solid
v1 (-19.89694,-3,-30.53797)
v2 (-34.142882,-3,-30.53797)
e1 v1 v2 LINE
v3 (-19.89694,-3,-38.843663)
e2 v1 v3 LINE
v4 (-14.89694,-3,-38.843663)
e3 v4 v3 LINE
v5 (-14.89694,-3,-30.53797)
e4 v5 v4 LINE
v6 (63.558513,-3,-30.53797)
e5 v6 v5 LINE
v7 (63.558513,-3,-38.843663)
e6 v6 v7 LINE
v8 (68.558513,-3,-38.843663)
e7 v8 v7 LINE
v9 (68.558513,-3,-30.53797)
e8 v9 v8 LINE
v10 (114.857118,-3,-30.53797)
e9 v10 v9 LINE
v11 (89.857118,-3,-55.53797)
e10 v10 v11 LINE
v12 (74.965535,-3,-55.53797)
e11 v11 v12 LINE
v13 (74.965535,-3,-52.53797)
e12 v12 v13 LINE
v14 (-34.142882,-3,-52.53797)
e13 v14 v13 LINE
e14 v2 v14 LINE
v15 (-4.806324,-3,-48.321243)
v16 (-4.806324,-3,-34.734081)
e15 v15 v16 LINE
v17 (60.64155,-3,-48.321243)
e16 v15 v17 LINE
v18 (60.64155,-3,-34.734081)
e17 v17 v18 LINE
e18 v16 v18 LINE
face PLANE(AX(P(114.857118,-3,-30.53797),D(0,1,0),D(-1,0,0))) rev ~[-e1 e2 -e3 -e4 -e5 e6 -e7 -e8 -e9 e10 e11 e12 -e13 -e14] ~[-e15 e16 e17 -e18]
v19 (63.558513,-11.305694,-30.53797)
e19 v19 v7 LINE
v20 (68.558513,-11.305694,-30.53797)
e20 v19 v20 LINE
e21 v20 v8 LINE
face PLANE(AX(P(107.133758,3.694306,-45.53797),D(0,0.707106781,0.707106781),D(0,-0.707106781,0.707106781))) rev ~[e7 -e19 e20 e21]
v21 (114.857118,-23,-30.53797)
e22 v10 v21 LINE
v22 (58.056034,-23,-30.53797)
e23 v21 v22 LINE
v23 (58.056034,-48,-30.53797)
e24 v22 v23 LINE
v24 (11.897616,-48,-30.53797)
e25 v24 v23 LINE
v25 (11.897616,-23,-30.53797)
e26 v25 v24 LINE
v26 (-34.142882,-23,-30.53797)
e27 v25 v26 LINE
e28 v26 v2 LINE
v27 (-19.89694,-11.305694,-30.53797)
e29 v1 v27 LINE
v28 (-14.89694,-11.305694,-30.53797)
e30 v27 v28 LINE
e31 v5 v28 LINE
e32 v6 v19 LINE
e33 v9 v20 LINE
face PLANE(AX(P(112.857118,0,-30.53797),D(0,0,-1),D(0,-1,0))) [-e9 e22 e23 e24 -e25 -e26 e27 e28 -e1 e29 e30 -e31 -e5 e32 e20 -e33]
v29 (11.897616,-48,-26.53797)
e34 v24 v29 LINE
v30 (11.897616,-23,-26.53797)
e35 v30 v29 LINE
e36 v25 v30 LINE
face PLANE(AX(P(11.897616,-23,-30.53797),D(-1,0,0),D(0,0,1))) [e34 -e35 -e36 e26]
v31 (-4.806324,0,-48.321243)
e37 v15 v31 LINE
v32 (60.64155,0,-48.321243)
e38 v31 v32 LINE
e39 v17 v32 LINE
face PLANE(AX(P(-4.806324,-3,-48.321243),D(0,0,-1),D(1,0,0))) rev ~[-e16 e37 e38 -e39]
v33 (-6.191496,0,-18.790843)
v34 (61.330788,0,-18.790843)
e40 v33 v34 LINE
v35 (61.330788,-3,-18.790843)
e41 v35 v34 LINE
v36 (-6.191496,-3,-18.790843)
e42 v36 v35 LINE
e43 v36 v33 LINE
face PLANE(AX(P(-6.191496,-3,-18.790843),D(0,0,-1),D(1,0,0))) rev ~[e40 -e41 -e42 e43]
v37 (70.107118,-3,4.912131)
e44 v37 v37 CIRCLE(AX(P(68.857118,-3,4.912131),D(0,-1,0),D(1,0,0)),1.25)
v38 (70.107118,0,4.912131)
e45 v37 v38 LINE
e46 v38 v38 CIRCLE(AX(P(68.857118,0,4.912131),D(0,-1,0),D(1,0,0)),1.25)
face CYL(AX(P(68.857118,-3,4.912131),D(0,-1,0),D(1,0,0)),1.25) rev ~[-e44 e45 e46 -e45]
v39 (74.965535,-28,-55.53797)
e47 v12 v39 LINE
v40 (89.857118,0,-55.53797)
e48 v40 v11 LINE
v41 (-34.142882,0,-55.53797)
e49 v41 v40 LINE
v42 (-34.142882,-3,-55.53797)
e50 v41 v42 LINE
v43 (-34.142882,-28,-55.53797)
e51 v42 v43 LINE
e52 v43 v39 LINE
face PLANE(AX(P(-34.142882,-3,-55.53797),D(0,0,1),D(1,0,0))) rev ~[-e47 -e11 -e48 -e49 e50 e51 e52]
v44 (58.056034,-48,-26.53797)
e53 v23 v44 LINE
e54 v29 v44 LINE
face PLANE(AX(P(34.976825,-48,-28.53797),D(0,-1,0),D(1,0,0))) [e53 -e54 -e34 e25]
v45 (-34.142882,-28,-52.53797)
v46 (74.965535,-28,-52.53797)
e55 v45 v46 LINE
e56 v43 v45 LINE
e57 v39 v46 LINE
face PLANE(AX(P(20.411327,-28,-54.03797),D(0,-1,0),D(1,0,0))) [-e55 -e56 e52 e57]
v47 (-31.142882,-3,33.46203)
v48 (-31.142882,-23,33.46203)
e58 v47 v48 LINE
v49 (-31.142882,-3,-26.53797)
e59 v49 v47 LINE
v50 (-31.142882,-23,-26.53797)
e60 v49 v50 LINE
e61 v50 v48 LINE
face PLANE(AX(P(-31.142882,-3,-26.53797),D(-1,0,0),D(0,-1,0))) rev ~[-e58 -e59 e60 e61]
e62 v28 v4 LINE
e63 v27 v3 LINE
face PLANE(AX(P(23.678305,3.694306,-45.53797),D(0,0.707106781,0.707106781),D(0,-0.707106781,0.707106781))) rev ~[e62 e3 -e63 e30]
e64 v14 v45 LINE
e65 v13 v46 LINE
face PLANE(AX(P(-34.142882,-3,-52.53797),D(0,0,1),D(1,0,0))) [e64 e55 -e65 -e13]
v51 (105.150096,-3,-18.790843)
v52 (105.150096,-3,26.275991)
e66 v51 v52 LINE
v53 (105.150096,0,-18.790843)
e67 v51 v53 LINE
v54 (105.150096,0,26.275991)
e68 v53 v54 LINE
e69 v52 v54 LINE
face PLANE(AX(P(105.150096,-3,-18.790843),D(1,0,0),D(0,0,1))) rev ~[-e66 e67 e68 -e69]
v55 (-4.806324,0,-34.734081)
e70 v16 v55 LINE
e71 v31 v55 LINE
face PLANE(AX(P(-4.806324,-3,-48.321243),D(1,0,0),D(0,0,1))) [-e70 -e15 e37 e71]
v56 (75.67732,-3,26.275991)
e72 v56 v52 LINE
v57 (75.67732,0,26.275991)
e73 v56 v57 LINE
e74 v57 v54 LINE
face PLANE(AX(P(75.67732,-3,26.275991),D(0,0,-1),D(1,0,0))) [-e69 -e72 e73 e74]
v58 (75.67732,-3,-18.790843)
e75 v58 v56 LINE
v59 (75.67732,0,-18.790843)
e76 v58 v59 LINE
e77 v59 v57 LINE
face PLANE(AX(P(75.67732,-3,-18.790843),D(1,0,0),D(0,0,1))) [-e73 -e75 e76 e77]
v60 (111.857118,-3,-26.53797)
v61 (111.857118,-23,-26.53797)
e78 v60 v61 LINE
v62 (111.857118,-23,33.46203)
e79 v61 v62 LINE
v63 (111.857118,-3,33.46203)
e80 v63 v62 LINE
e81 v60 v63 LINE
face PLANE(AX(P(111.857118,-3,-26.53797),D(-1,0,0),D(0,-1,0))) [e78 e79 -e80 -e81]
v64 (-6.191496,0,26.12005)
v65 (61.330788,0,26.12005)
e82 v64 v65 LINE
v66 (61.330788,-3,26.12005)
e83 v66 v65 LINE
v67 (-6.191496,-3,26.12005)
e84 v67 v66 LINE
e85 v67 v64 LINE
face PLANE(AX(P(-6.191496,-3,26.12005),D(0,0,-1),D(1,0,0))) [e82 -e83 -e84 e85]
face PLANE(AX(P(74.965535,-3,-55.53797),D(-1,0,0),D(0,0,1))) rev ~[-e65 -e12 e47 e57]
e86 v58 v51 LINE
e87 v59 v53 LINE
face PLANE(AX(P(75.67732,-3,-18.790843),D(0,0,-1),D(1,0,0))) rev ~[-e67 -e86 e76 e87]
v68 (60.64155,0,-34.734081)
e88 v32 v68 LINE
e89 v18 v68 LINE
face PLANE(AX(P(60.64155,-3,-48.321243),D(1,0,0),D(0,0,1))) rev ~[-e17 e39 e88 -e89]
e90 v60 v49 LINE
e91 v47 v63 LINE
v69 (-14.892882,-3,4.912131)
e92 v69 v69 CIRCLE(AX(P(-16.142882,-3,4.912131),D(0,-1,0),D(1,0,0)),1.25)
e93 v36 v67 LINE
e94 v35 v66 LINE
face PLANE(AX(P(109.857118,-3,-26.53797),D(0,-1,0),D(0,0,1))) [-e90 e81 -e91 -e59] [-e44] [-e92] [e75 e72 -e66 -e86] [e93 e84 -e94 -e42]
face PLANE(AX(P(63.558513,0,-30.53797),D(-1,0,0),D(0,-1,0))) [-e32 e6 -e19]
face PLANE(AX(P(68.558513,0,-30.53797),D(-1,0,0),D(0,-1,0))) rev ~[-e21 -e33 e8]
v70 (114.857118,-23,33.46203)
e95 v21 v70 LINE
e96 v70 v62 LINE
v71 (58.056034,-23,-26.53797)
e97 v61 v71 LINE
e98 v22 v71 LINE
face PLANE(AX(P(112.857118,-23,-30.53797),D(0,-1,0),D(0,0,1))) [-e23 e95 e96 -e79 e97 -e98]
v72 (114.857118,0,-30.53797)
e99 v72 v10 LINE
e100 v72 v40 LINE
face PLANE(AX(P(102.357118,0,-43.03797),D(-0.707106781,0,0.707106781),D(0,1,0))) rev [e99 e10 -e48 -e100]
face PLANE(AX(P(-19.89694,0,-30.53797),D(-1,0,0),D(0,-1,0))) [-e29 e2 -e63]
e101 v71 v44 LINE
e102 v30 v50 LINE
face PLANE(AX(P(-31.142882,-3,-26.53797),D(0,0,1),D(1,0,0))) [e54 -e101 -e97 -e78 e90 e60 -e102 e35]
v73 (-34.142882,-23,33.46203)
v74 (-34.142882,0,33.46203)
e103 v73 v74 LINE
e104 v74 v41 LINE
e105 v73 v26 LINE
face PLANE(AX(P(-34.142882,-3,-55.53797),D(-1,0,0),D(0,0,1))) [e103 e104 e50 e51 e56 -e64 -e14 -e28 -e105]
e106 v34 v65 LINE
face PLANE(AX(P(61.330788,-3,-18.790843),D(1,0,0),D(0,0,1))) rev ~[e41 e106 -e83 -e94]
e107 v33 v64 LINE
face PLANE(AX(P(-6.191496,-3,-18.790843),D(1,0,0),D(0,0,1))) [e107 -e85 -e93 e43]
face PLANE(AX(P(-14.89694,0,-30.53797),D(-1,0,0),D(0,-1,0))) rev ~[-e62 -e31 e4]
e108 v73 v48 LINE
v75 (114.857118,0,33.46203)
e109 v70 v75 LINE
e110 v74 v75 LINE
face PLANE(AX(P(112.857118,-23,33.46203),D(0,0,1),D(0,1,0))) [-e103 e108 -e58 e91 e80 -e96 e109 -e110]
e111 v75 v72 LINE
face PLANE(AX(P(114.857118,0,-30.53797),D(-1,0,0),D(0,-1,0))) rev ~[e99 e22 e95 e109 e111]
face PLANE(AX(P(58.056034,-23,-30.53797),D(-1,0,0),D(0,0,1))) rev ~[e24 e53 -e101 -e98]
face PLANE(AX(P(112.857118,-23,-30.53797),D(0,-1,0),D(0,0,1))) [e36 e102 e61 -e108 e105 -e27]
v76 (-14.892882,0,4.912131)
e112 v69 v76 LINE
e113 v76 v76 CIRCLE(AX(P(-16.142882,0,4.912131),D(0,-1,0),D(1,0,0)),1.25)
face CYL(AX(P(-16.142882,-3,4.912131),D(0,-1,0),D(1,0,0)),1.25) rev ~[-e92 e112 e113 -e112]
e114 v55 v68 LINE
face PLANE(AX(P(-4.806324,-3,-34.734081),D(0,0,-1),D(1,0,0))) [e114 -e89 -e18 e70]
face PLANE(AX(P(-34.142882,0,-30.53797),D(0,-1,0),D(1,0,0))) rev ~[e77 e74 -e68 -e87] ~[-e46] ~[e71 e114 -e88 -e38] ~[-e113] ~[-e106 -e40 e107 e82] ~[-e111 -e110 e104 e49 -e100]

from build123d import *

# Parameters (mm, degrees)
F0_W         = 147
F0_H         = 60
F1_DEPTH     = 3
F2_W         = 3
F2_H         = 60
F3_DEPTH     = 20
F4_DEPTH     = 4
F5_W         = 141
F5_H         = 4
F6_DEPTH     = 20
F7_DEPTH     = 2
F8_DEPTH     = 2
F10_W        = 5
F10_H        = 11.305693537
F11_DEPTH    = 15
F9_R         = 1.25
F12_DEPTH    = 25
F13_T4_DEPTH = 82.150489639
F13_T9_DEPTH = 82.150489639
F14_W        = 14.2459415197
F14_H        = 3
F14_W_2      = 46.2986054569
F14_W_3      = 5
F14_W_4      = 78.4554530233
F15_DEPTH    = 25
F16_SIZE     = 25
F17_W        = 109.1084168532
F17_H        = 3
F18_DEPTH    = 25
F19_W        = 67.5222836435
F19_H        = 44.9108928442
F19_W_2      = 29.4727757573
F19_H_2      = 45.0668334961
F20_DEPTH    = 25
F21_W        = 65.4478734359
F21_H        = 13.5871618986
F22_DEPTH    = 25
F23_W        = 46.1584180593
F23_H        = 4
F24_DEPTH    = 25


# Not quite as in the source:
# - a fillet or chamfer that OpenCascade refuses, or shapes differently, is made with other operations: its cross-section is extruded or revolved along the edge and cut away or added


with BuildPart() as f1:
    # F0 (on Front) → F1 (new body)
    with BuildSketch(Plane.XZ):
        with Locations((39.3571183681, 3.4620302916)):
            Rectangle(F0_W, F0_H)
    extrude(amount=F1_DEPTH)

    # F2 (on face) → F3 (join)
    with BuildSketch(Plane.XZ.offset(3)):
        with Locations((-32.6428816319, 3.4620302916)):
            Rectangle(F2_W, F2_H)
        with Locations((111.3571183681, 3.4620302916)):
            Rectangle(F2_W, F2_H)
    extrude(amount=F3_DEPTH)

    # F4 (add): a face of the model
    f4_faces = [f1.faces().sort_by_distance(p)[0] for p in [
        (-32.6549972277, -11.5, -26.5379697084),
    ]]
    extrude(f4_faces, amount=F4_DEPTH)

    # F5 (on face) → F6 (join)
    with BuildSketch(Plane.XZ.offset(3)):
        with Locations((39.3571183681, -28.5379697084)):
            Rectangle(F5_W, F5_H)
    extrude(amount=F6_DEPTH)

    # F7 (add): a face of the model
    f7_faces = [f1.faces().sort_by_distance(p)[0] for p in [
        (112.8571183681, -11.5, 1.4620302916),
    ]]
    extrude(f7_faces, amount=F7_DEPTH)

    # F8 (cut): a face of the model
    f8_faces = [f1.faces().sort_by_distance(p)[0] for p in [
        (109.8571183681, -13, 3.4620302916),
    ]]
    extrude(f8_faces, amount=-F8_DEPTH, mode=Mode.SUBTRACT)

    # F10 (on face) → F11 (join)
    with BuildSketch(Plane(origin=(0, 0, -30.5379697084), x_dir=(1, 0, 0), z_dir=(0, 0, -1))):
        with Locations((-17.3969401121, 5.6528467685)):
            Rectangle(F10_W, F10_H)
        with Locations((66.0585129112, 5.6528467685)):
            Rectangle(F10_W, F10_H)
    extrude(amount=F11_DEPTH)

    # F9 (on face) → F12 (cut)
    with BuildSketch(Plane.XZ.offset(3)):
        with Locations((-16.1428816319, 4.912131466)):
            Circle(F9_R)
        with Locations((68.8571183681, 4.912131466)):
            Circle(F9_R)
    extrude(amount=-F12_DEPTH, mode=Mode.SUBTRACT)

    # F13: chamfer of 15 on 2 edges, made by hand


with BuildPart() as f13_tool2:
    # F13_s3 → F13_t4 (new body)
    with BuildSketch(Plane.YZ.offset(23.6783047074)):
        Polygon((3.694306463, -45.5379697084), (-11.305693537, -30.5379697084), (-11.305693537, -45.5379697084), align=None)
    extrude(amount=-F13_T4_DEPTH)

    split(bisect_by=Plane.XY.offset(-30.5379697084), keep=Keep.BOTTOM)


with BuildPart() as f1_1:
    add(f1.part)

    # F13_t1: cut F13_tool2
    add(f13_tool2.part, mode=Mode.SUBTRACT)


with BuildPart() as f13_tool7:
    # F13_s8 → F13_t9 (new body)
    with BuildSketch(Plane.YZ.offset(107.1337577307)):
        Polygon((3.694306463, -45.5379697084), (-11.305693537, -30.5379697084), (-11.305693537, -45.5379697084), align=None)
    extrude(amount=-F13_T9_DEPTH)

    split(bisect_by=Plane.XY.offset(-30.5379697084), keep=Keep.BOTTOM)


with BuildPart() as f1_2:
    add(f1_1.part)

    # F13_t6: cut F13_tool7
    add(f13_tool7.part, mode=Mode.SUBTRACT)

    # F14 (on face) → F15 (join)
    with BuildSketch(Plane(origin=(0, 0, -30.5379697084), x_dir=(1, 0, 0), z_dir=(0, 0, -1))):
        with Locations((-27.019910872, 1.5)):
            Rectangle(F14_W, F14_H)
        with Locations((91.7078156397, 1.5)):
            Rectangle(F14_W_2, F14_H)
        with Locations((-17.3969401121, 1.5)):
            Rectangle(F14_W_3, F14_H)
        with Locations((66.0585129112, 1.5)):
            Rectangle(F14_W_3, F14_H)
        with Locations((24.3307863995, 1.5)):
            Rectangle(F14_W_4, F14_H)
    extrude(amount=F15_DEPTH)

    # F16
    f16_edges = [f1_2.edges().sort_by_distance(p)[0] for p in [
        (114.857118, -1.5, -55.53797),
    ]]
    chamfer(f16_edges, length=F16_SIZE)

    # F17 (on face) → F18 (join)
    with BuildSketch(Plane.XZ.offset(3)):
        with Locations((20.4113267948, -54.0379697084)):
            Rectangle(F17_W, F17_H)
    extrude(amount=F18_DEPTH)

    # F19 (on face) → F20 (cut)
    with BuildSketch(Plane.XZ.offset(3)):
        with Locations((27.5696460158, 3.6646034569)):
            Rectangle(F19_W, F19_H)
        with Locations((90.4137082398, 3.7425737828)):
            Rectangle(F19_W_2, F19_H_2)
    extrude(amount=-F20_DEPTH, mode=Mode.SUBTRACT)

    # F21 (on face) → F22 (cut)
    with BuildSketch(Plane.XZ.offset(3)):
        with Locations((27.9176128097, -41.5276624262)):
            Rectangle(F21_W, F21_H)
    extrude(amount=-F22_DEPTH, mode=Mode.SUBTRACT)

    # F23 (on face) → F24 (join)
    with BuildSketch(Plane.XZ.offset(23)):
        with Locations((34.9768251181, -28.5379697084)):
            Rectangle(F23_W, F23_H)
    extrude(amount=F24_DEPTH)


solid = f1_2.part
